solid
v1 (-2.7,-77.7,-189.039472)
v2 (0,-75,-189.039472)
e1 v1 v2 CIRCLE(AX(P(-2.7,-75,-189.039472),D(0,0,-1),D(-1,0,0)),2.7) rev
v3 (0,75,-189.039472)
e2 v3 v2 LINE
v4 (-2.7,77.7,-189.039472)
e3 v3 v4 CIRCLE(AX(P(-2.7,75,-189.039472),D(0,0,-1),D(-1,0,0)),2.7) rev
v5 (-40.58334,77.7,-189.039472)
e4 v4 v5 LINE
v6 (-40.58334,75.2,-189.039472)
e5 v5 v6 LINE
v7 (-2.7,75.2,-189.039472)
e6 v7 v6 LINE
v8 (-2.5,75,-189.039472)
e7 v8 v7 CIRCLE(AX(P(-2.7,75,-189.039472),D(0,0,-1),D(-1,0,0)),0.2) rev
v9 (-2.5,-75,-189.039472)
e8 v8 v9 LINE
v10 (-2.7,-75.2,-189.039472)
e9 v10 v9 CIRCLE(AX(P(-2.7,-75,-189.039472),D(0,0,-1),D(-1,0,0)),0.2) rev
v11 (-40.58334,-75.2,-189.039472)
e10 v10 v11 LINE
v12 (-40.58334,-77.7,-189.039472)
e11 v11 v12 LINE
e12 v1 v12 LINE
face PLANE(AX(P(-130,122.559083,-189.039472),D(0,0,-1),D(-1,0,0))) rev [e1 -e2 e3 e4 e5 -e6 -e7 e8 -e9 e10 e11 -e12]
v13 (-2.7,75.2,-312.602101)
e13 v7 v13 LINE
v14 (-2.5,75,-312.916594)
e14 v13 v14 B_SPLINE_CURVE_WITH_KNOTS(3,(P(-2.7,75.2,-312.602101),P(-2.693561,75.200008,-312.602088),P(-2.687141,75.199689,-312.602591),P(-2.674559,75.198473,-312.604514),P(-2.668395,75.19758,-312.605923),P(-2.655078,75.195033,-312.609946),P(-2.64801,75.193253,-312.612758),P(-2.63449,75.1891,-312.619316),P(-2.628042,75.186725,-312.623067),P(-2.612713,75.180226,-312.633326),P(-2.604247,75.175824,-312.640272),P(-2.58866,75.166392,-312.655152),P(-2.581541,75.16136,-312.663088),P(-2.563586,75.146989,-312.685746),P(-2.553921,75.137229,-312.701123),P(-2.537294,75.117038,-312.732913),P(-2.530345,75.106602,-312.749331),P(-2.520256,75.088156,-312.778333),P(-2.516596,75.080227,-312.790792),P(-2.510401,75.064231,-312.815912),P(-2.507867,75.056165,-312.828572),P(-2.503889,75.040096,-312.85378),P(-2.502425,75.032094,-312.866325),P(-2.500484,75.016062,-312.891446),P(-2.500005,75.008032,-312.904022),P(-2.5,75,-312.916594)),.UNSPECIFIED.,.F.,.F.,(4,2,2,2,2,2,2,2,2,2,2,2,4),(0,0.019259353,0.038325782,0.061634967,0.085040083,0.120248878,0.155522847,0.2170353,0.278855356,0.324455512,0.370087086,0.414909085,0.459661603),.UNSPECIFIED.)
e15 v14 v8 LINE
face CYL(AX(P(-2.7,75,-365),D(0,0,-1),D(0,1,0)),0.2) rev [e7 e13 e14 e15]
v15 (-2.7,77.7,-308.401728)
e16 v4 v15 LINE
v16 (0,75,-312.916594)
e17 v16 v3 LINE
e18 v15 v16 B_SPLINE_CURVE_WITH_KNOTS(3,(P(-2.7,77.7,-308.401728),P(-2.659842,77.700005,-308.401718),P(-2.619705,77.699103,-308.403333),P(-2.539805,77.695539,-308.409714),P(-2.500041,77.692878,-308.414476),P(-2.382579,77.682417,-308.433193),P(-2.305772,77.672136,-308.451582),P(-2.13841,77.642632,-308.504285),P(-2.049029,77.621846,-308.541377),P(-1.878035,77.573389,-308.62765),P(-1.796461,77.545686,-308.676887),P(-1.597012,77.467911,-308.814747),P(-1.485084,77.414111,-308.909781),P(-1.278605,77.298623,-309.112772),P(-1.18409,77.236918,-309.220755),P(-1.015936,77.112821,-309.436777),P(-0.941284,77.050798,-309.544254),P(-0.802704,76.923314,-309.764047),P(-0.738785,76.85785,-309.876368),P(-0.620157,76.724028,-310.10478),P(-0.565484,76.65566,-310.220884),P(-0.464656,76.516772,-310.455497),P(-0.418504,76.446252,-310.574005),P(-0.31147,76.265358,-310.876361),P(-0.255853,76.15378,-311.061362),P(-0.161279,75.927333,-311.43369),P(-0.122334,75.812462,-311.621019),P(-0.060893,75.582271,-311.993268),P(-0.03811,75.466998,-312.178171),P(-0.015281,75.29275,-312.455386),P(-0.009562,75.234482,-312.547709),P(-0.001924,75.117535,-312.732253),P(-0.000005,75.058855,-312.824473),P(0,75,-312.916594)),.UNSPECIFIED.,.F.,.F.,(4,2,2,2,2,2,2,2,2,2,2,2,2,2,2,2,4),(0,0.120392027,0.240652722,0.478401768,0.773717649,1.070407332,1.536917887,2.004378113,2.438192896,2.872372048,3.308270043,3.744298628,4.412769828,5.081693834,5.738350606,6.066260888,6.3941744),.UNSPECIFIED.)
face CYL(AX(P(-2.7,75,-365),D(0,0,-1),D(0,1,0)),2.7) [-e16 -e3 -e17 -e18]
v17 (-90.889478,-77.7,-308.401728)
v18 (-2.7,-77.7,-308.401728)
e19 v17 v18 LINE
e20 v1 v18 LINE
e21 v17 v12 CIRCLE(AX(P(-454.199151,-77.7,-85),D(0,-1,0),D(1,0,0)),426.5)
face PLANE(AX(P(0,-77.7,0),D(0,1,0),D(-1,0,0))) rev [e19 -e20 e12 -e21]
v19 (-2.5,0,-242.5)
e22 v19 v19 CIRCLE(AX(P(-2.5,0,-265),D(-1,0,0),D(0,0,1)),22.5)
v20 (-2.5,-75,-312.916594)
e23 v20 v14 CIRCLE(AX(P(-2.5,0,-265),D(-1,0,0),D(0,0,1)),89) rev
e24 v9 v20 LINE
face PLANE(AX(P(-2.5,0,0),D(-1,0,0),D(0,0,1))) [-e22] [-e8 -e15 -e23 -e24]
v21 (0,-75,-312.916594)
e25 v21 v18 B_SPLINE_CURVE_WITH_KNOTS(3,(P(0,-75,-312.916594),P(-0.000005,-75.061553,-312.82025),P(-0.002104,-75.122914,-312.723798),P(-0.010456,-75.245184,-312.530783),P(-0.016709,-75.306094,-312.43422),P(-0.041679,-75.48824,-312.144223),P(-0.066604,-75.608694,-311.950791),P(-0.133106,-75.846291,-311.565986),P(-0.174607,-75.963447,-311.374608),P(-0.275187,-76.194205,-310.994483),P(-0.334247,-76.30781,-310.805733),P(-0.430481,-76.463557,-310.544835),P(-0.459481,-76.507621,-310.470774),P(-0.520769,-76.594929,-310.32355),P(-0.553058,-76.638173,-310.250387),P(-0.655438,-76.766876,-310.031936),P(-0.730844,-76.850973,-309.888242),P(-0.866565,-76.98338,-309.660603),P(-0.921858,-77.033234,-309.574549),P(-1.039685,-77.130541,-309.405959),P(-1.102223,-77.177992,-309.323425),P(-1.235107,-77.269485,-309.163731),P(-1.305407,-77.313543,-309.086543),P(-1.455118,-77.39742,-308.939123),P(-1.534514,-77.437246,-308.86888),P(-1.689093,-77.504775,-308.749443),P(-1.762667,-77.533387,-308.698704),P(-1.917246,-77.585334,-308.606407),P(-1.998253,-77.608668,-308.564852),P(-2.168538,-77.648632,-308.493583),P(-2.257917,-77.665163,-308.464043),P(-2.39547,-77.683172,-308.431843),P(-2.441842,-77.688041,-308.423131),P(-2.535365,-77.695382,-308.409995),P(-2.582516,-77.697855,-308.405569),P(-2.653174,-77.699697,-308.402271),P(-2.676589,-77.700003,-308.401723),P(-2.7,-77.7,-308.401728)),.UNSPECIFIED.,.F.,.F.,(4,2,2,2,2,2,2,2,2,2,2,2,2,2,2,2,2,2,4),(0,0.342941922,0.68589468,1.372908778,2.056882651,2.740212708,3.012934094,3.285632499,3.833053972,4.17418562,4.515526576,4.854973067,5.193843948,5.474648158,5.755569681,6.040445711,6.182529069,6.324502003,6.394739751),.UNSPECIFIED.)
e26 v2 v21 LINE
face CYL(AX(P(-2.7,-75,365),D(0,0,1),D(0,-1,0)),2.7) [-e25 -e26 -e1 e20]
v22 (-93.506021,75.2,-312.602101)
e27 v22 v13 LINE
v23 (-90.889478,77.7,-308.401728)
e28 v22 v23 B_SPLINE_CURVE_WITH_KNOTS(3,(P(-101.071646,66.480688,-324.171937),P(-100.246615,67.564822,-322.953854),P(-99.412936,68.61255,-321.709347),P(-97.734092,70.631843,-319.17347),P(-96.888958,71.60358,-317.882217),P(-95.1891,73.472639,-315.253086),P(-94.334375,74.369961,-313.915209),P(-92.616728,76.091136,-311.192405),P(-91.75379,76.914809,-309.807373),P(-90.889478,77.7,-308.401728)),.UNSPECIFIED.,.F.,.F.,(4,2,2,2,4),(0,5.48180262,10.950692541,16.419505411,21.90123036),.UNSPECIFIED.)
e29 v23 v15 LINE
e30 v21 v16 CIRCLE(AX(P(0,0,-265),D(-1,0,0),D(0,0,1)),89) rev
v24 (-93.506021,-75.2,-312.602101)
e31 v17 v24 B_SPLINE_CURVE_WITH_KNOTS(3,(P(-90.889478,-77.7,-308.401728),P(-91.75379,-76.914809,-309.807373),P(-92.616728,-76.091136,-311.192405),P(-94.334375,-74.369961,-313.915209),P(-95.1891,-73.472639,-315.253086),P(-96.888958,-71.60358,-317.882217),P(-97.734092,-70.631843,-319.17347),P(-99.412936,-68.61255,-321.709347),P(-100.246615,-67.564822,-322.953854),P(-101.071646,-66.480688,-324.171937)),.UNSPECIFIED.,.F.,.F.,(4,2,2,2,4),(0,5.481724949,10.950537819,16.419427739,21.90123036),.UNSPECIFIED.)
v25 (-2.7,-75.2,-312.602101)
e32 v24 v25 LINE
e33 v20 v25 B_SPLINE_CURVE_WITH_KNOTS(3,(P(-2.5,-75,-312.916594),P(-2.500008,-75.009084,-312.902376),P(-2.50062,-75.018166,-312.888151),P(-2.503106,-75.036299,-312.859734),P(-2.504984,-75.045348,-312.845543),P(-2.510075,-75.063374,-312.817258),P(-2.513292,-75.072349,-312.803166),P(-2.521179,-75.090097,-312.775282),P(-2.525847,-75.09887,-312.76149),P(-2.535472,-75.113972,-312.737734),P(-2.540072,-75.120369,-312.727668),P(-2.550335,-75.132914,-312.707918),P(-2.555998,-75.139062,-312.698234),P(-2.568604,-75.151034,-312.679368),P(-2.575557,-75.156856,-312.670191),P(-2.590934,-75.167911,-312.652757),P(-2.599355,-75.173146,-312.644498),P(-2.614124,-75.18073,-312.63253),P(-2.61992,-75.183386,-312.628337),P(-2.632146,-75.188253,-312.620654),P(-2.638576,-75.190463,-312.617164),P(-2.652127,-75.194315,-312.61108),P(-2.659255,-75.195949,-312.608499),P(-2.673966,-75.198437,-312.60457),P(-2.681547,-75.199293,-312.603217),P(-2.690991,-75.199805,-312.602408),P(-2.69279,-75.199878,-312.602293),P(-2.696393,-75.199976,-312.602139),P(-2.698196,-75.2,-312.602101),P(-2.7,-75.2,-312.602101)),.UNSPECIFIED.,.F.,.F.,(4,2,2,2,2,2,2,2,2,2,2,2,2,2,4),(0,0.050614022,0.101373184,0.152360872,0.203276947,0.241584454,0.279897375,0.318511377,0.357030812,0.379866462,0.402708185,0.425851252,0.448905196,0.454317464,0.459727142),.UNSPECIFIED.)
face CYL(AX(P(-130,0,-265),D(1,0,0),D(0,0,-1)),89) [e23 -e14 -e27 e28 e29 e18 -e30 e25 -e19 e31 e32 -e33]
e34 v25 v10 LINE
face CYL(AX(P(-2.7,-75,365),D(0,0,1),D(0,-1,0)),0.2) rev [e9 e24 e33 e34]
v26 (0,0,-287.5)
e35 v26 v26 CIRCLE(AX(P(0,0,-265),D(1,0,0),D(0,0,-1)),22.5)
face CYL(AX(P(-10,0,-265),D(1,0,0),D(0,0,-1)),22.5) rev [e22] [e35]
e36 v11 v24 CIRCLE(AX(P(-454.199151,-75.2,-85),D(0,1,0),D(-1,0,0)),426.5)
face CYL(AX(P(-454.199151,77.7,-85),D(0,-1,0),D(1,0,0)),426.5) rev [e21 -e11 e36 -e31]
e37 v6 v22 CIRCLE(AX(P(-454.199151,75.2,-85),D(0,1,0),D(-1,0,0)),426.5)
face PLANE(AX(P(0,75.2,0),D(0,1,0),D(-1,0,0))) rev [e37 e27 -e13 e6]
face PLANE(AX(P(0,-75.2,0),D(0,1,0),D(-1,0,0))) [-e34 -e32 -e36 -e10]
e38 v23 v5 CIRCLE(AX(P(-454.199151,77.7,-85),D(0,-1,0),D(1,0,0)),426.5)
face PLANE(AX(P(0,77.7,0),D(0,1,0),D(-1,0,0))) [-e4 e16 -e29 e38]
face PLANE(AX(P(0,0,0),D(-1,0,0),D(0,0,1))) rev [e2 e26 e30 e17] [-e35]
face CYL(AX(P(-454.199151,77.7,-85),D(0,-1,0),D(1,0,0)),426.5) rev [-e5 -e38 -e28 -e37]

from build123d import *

# Parameters (mm, degrees)
SKETCH1_W               = 730
SKETCH1_H               = 150
BASE_FLANGE1_DEPTH      = 2.5
EDGE_FLANGE1_DEPTH      = 730
EDGE_FLANGE1_BEND_DEPTH = 730
CUT_EXTRUDE1_DEPTH      = 418.461567093
CUT_EXTRUDE1_DEPTH_BACK = 418.461567093
SKETCH12_R              = 434
SKETCH13_R              = 22.5
CUT_EXTRUDE2_DEPTH      = 10
CUT_EXTRUDE3_DEPTH      = 396.173746598
CUT_EXTRUDE3_DEPTH_BACK = 396.173746598
SKETCH14_W              = 631.337566112
SKETCH14_H              = 273.157514278
CUT_EXTRUDE4_DEPTH      = 396.173746598
CUT_EXTRUDE4_DEPTH_BACK = 396.173746598
CUT_EXTRUDE5_DEPTH      = 400.448552929


# Sheet-metal steps are written as plain solids
with BuildPart() as part:
    # Sketch1 → Base-Flange1 (new body)
    with BuildSketch(Plane(origin=(0, 0, 0), x_dir=(0, 0, -1), z_dir=(1, 0, 0))):
        Rectangle(SKETCH1_W, SKETCH1_H)
    extrude(amount=-BASE_FLANGE1_DEPTH)

    # Edge-Flange1 section (across the edge) → Edge-Flange1 (add)
    with BuildSketch(Plane(origin=(-2.5, 75.2, 365), x_dir=(0, -1, 0), z_dir=(0, 0, -1))):
        with BuildLine():
            Line((-2.5, 0.2), (-2.5, 127.5))
            Line((-2.5, 127.5), (0, 127.5))
            Line((0, 127.5), (0, 0.2))
            ThreePointArc((0, 0.2), (0.058578644, 0.058578644), (0.2, 0))
            Line((0.2, 0), (0.2, -2.5))
            ThreePointArc((0.2, -2.5), (-1.709188309, -1.709188309), (-2.5, 0.2))
        make_face()
    extrude(amount=EDGE_FLANGE1_DEPTH)

    # Edge-Flange1 section 2 (across the edge) → Edge-Flange1 bend (add)
    with BuildSketch(Plane(origin=(-2.5, -75.2, -365), x_dir=(0, 1, 0), z_dir=(0, 0, 1))):
        with BuildLine():
            Line((-2.5, 0.2), (-2.5, 127.5))
            Line((-2.5, 127.5), (0, 127.5))
            Line((0, 127.5), (0, 0.2))
            ThreePointArc((0, 0.2), (0.058578644, 0.058578644), (0.2, 0))
            Line((0.2, 0), (0.2, -2.5))
            ThreePointArc((0.2, -2.5), (-1.709188309, -1.709188309), (-2.5, 0.2))
        make_face()
    extrude(amount=EDGE_FLANGE1_BEND_DEPTH)

    # Sketch12 → Cut-Extrude1 (cut, two sides: drawn at the far end of the back side and taken through both)
    with BuildSketch(Plane(origin=(0, 77.7, 0), x_dir=(1, 0, 0), z_dir=(0, 1, 0)).offset(-CUT_EXTRUDE1_DEPTH_BACK)):
        with Locations((-470, 85)):
            Circle(SKETCH12_R)
    extrude(amount=CUT_EXTRUDE1_DEPTH + CUT_EXTRUDE1_DEPTH_BACK, mode=Mode.SUBTRACT)

    # Sketch13 → Cut-Extrude2 (cut)
    with BuildSketch(Plane(origin=(0, 0, 0), x_dir=(0, 0, -1), z_dir=(1, 0, 0))):
        with Locations((265, 0)):
            Circle(SKETCH13_R)
        with Locations((-290, 0)):
            Circle(SKETCH13_R)
    extrude(amount=-CUT_EXTRUDE2_DEPTH, mode=Mode.SUBTRACT)

    # Sketch14 → Cut-Extrude3 (cut, two sides: drawn at the far end of the back side and taken through both)
    with BuildSketch(Plane(origin=(0, 0, 0), x_dir=(0, 0, -1), z_dir=(1, 0, 0)).offset(-CUT_EXTRUDE3_DEPTH_BACK)):
        with Locations((-126.629311255, -14.019673746)):
            Rectangle(SKETCH14_W, SKETCH14_H)
    extrude(amount=CUT_EXTRUDE3_DEPTH + CUT_EXTRUDE3_DEPTH_BACK, mode=Mode.SUBTRACT)

    # Sketch15 → Cut-Extrude4 (cut, two sides: drawn at the far end of the back side and taken through both)
    with BuildSketch(Plane(origin=(0, 0, 0), x_dir=(0, 0, -1), z_dir=(1, 0, 0)).offset(-CUT_EXTRUDE4_DEPTH_BACK)):
        with BuildLine():
            Line((302.266550641, 80.822052704), (310.532003477, 105.351783703))
            Line((310.532003477, 105.351783703), (400.668447303, 94.566226322))
            Line((400.668447303, 94.566226322), (380.252927975, -108.048173048))
            Line((380.252927975, -108.048173048), (291.286888445, -85.029403714))
            ThreePointArc((291.286888445, -85.029403714), (353.805609642, -5.879089735), (302.266550641, 80.822052704))
        make_face()
    extrude(amount=CUT_EXTRUDE4_DEPTH + CUT_EXTRUDE4_DEPTH_BACK, mode=Mode.SUBTRACT)

    # Sketch16 → Cut-Extrude5 (cut, through all)
    with BuildSketch(Plane.XZ.offset(77.7)):
        with BuildLine():
            Line((-39.289490613, -183.753349909), (-75.528167694, -178.562999568))
            Line((-75.528167694, -178.562999568), (-125.004878412, -316.53047916))
            Line((-125.004878412, -316.53047916), (-101.585534734, -324.928922734))
            ThreePointArc((-101.585534734, -324.928922734), (-63.999675541, -257.181937871), (-39.289490613, -183.753349909))
        make_face()
    extrude(amount=-CUT_EXTRUDE5_DEPTH, mode=Mode.SUBTRACT)


solid = part.part
